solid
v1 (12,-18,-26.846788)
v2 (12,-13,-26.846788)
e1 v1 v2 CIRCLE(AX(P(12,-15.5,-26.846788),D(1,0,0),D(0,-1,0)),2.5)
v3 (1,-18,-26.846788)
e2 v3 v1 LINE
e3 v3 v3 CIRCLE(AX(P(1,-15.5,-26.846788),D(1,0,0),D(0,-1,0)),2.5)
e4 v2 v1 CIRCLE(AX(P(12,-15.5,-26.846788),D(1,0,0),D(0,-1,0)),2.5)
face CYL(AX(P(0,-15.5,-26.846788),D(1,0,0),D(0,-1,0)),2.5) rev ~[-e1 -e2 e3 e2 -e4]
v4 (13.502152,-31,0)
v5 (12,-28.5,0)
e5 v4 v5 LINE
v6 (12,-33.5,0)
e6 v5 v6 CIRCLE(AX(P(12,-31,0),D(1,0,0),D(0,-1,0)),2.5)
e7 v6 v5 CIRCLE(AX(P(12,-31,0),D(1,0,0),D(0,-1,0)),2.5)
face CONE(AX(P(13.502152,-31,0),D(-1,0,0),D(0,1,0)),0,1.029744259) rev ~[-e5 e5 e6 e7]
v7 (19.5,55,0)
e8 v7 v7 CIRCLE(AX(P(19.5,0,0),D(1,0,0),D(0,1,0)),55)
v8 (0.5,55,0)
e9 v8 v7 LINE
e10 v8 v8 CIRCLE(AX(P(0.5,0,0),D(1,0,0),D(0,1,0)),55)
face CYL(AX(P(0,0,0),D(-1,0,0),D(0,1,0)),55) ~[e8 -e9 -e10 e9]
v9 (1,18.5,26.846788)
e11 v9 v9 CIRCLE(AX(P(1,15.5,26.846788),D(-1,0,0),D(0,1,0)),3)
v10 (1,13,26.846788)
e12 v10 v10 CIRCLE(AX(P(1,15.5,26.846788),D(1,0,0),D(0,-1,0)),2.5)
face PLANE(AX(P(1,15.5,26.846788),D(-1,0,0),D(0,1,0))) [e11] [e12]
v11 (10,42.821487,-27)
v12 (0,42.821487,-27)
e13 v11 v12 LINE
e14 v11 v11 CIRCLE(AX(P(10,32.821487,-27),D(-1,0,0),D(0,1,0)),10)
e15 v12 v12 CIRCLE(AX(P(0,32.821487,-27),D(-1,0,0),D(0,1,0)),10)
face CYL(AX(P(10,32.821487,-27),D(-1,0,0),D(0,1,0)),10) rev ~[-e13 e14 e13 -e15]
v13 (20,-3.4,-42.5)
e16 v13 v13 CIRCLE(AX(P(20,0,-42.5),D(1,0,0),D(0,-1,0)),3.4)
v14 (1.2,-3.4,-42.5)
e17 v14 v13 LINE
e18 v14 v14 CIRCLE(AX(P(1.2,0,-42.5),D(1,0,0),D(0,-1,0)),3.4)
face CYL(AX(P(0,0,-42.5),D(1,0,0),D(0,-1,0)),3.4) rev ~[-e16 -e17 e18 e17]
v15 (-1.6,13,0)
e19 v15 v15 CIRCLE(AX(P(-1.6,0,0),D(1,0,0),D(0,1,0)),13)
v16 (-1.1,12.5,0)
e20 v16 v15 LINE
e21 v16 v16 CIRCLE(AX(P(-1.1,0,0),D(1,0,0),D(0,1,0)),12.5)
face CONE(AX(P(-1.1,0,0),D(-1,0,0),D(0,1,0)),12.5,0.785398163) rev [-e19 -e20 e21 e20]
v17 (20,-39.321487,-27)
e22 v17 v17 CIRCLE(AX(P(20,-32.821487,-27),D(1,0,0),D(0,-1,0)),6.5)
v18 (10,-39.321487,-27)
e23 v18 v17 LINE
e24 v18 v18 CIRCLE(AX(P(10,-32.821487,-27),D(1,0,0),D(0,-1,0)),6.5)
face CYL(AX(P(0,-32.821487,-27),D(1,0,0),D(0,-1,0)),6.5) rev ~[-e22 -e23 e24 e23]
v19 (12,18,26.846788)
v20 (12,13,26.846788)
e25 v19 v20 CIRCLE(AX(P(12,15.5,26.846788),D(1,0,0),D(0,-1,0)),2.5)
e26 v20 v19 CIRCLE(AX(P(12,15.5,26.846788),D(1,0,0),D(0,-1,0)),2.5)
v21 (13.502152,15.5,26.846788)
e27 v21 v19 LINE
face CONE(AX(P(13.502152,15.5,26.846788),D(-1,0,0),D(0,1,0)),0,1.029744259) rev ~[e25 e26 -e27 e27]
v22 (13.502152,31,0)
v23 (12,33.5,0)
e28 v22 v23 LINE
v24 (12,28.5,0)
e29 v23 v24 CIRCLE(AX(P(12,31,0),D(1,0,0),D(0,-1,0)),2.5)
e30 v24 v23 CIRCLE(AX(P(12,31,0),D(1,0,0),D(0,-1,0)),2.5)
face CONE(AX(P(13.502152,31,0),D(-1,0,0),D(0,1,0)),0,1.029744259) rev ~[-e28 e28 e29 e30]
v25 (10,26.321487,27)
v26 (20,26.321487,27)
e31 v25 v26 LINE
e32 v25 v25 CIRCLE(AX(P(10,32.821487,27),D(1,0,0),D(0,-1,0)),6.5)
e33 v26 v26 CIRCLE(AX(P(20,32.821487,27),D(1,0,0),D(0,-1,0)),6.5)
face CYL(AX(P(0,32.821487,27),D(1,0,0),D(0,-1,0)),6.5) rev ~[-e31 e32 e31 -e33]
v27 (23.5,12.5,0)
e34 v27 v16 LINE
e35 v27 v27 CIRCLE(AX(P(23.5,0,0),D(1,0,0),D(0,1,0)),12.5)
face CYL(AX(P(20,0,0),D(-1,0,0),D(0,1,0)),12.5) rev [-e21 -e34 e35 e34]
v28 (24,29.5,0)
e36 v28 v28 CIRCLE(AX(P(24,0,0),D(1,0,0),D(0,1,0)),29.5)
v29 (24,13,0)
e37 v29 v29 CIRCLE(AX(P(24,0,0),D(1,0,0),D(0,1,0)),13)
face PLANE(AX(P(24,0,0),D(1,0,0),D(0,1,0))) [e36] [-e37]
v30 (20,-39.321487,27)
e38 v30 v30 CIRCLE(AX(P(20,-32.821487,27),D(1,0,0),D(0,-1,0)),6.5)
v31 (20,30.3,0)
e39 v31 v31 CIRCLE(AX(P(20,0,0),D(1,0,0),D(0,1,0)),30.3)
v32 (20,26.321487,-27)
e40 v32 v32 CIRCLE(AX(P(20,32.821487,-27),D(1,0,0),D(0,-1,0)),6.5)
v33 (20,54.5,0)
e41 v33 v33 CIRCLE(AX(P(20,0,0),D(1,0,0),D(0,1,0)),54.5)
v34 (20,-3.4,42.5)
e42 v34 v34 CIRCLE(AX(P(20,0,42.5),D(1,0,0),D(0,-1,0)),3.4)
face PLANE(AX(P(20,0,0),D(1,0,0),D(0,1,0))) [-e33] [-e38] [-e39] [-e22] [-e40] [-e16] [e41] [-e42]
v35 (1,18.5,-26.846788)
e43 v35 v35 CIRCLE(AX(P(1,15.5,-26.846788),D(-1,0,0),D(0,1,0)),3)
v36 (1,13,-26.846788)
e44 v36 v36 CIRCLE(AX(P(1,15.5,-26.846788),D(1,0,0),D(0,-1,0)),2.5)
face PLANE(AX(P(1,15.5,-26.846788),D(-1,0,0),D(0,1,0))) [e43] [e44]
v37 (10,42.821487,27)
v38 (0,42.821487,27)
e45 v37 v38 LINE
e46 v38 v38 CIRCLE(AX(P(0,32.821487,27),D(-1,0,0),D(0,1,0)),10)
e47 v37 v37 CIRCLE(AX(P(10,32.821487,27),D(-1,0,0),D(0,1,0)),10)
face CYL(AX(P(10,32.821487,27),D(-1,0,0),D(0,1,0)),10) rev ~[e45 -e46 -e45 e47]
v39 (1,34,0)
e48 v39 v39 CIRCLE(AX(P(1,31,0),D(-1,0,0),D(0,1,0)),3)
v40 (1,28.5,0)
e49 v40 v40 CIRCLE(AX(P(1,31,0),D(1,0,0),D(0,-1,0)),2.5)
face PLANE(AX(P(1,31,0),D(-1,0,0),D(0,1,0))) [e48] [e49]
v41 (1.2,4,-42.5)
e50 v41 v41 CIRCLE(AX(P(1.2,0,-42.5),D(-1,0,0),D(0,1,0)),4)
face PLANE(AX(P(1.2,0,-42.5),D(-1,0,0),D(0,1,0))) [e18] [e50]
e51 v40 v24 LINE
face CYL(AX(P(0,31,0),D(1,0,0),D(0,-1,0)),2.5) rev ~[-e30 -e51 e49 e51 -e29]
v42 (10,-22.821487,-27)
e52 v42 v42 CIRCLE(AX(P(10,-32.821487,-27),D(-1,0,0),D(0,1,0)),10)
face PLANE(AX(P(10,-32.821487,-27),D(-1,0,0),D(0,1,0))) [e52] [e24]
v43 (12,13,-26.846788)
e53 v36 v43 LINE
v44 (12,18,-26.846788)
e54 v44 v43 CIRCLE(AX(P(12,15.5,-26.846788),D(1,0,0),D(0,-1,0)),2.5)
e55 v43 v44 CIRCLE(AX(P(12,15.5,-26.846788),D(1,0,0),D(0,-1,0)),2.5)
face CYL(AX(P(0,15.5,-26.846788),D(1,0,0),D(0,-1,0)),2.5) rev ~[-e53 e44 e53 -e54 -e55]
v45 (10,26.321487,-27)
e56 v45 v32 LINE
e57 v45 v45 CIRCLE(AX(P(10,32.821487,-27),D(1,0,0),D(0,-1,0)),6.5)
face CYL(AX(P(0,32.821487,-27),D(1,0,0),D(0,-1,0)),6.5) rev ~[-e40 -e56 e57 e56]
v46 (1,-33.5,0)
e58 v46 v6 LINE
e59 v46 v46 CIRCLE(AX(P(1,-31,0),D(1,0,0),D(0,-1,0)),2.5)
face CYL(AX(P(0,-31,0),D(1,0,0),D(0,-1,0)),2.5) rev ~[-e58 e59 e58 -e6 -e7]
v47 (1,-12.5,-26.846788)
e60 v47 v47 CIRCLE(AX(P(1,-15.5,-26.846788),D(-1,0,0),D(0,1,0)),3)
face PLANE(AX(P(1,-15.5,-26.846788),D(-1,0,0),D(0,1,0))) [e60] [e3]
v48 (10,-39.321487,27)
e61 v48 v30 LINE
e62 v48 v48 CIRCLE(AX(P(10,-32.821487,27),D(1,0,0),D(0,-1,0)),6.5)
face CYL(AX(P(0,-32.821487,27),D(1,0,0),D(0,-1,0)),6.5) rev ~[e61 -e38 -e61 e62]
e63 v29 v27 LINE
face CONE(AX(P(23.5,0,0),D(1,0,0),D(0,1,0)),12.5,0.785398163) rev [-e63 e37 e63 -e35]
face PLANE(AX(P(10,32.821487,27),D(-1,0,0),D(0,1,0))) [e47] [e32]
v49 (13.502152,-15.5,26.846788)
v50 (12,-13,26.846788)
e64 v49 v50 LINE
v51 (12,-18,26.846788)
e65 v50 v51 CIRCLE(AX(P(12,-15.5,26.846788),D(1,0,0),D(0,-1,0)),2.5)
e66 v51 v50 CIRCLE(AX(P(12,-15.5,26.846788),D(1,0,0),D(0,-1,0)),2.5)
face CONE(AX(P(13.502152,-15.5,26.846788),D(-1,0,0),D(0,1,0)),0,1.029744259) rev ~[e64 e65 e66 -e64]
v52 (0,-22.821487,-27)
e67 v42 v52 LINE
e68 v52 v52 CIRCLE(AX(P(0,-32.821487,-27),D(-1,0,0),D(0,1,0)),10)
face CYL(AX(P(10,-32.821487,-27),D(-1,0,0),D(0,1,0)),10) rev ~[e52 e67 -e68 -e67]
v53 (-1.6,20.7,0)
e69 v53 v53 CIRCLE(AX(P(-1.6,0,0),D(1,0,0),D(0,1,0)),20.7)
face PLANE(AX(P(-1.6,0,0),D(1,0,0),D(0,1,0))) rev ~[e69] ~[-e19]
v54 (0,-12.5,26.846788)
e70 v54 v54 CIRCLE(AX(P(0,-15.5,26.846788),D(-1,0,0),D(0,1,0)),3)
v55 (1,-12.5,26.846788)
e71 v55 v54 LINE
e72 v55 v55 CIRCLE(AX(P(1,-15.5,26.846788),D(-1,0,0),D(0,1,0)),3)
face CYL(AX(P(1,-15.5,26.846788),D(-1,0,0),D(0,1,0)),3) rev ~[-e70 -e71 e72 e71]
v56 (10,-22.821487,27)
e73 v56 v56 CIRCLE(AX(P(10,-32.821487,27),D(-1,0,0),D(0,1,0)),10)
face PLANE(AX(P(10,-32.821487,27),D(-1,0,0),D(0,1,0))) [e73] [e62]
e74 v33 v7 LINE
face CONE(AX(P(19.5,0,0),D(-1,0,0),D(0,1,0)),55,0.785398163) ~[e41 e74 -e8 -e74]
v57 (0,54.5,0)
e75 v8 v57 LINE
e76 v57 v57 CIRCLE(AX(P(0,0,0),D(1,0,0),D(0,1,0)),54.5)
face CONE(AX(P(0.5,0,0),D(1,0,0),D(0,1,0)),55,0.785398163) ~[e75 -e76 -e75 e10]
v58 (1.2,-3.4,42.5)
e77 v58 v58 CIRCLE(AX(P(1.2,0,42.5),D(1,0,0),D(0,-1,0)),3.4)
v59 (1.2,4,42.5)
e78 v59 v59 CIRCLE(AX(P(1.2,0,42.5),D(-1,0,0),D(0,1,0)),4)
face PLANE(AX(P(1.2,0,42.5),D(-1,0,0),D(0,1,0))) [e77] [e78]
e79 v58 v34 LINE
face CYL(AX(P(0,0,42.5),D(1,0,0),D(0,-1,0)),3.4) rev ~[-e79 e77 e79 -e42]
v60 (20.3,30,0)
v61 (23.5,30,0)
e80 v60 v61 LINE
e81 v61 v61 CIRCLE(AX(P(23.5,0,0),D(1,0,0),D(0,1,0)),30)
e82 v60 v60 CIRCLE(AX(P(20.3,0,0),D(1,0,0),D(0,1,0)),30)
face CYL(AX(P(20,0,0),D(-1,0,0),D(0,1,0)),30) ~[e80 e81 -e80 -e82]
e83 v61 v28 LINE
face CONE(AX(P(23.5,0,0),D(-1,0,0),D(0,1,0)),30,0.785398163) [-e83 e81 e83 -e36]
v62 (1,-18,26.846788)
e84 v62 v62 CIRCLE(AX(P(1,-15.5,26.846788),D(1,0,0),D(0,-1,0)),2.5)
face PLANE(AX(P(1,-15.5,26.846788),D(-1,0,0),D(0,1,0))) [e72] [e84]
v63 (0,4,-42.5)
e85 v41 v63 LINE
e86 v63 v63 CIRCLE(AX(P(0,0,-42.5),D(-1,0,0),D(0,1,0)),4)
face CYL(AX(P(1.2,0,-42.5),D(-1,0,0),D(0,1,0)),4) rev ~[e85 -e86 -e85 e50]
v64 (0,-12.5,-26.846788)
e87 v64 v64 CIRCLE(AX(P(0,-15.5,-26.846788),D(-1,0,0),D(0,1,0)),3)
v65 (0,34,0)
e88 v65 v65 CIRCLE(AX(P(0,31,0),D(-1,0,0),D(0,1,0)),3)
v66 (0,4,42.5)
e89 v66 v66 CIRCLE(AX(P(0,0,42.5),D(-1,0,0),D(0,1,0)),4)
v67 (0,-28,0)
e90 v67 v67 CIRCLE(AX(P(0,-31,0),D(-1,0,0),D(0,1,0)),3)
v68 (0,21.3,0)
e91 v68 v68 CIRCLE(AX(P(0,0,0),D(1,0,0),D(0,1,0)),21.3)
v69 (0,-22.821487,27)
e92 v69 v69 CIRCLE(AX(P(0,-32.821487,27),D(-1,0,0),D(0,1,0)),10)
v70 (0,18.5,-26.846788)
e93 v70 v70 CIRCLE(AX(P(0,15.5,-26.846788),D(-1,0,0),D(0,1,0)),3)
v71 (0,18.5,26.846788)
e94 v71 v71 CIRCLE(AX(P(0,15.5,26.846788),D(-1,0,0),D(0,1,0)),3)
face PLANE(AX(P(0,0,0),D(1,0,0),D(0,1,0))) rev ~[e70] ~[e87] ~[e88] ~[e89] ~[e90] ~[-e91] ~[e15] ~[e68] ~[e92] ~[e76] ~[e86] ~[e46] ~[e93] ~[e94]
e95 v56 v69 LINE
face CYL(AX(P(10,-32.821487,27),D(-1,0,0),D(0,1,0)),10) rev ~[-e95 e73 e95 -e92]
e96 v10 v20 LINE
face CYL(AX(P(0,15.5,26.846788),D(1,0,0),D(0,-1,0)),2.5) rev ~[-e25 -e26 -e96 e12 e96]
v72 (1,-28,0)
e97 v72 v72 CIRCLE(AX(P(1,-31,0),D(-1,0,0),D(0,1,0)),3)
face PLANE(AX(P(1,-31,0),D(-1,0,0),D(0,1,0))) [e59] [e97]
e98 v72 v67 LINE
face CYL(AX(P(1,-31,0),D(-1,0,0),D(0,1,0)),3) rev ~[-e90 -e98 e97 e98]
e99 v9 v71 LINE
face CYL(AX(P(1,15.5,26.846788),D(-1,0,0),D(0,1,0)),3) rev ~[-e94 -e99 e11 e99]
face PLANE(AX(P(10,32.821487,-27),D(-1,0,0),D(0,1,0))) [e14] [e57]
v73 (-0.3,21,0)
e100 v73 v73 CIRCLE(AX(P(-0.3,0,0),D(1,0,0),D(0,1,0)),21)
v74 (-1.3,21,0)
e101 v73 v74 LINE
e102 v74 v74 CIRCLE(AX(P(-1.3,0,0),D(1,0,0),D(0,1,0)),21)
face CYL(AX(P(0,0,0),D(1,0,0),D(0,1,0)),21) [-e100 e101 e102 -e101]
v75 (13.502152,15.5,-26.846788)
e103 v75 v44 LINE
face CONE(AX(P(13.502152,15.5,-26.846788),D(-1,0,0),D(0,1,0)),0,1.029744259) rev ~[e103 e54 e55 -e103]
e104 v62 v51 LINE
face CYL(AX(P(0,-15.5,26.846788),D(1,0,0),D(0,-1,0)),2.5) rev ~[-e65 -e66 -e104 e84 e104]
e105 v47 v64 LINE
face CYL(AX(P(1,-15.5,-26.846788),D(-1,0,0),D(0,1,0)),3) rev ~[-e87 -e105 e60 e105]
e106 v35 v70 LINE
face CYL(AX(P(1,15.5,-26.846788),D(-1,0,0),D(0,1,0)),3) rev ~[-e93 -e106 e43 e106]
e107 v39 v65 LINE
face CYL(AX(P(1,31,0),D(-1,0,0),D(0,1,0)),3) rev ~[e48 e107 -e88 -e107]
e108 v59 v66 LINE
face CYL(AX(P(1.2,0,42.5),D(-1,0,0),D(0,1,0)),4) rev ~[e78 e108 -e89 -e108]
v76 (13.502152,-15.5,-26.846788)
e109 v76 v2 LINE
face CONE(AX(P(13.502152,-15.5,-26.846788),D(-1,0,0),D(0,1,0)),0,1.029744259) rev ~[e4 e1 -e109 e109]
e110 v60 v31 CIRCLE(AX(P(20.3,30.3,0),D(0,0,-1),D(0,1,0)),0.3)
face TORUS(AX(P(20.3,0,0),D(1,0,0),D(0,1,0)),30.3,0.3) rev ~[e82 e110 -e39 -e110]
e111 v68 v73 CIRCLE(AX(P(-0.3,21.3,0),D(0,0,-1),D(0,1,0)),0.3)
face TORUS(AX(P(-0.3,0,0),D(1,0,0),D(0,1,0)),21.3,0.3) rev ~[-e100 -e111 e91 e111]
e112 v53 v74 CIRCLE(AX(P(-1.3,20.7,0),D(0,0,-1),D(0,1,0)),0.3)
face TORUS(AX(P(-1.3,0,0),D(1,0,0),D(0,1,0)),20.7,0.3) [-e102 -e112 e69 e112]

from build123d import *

# Parameters (mm, degrees)
F0_R           = 55
F0_R_2         = 30
F0_R_3         = 21
F0_R_4         = 12.5
F1_DEPTH       = 20
F2_DEPTH       = 1.6
F3_R           = 30
F3_R_2         = 12.5
F4_DEPTH       = 4
F5_D           = 5
F5_DEPTH       = 12
F5_CBORE_D     = 6
F5_CBORE_DEPTH = 1
F5_TIP         = 1.5021515476
F6_D           = 13
F6_CBORE_D     = 20
F6_CBORE_DEPTH = 10
F7_D           = 6.8
F7_CBORE_D     = 8
F7_CBORE_DEPTH = 1.2
F8_SIZE2       = 0.5
F8_SIZE        = 0.5
F9_R           = 0.3


with BuildPart() as f1:
    # F0 (on Right) → F1 (new body)
    with BuildSketch(Plane.YZ):
        Circle(F0_R)
        Circle(F0_R_2, mode=Mode.SUBTRACT)
        Circle(F0_R_2)
        Circle(F0_R_3, mode=Mode.SUBTRACT)
        Circle(F0_R_3)
        Circle(F0_R_4, mode=Mode.SUBTRACT)
    extrude(amount=F1_DEPTH)

    # F0 (on Right) → F2 (join)
    with BuildSketch(Plane.YZ):
        Circle(F0_R_3)
        Circle(F0_R_4, mode=Mode.SUBTRACT)
    extrude(amount=-F2_DEPTH)

    # F3 (on face) → F4 (join)
    with BuildSketch(Plane.YZ.offset(20)):
        Circle(F3_R)
        Circle(F3_R_2, mode=Mode.SUBTRACT)
    extrude(amount=F4_DEPTH)

    # F5
    with Locations(Plane(origin=(0, 0, 0), x_dir=(0, 1, 0), z_dir=(-1, 0, 0))):
        with Locations((-15.5, -26.8467875173), (-31, 0), (-15.5, 26.8467875173), (15.5, -26.8467875173), (31, 0), (15.5, 26.8467875173)):
            CounterBoreHole(F5_D / 2, F5_CBORE_D / 2, F5_CBORE_DEPTH, depth=F5_DEPTH)
            with Locations((0, 0, -(F5_DEPTH + F5_TIP / 2))):  # 118° drill point
                Cone(0, F5_D / 2, F5_TIP, mode=Mode.SUBTRACT)

    # F6 (through all)
    with Locations(Plane(origin=(0, 0, 0), x_dir=(0, 1, 0), z_dir=(-1, 0, 0))):
        with Locations((-32.8214868646, 27), (-32.8214868646, -27), (32.8214868646, -27), (32.8214868646, 27)):
            CounterBoreHole(F6_D / 2, F6_CBORE_D / 2, F6_CBORE_DEPTH)

    # F7 (through all)
    with Locations(Plane(origin=(0, 0, 0), x_dir=(0, 1, 0), z_dir=(-1, 0, 0))):
        with Locations((0, -42.5), (0, 42.5)):
            CounterBoreHole(F7_D / 2, F7_CBORE_D / 2, F7_CBORE_DEPTH)

    # F8
    f8_edges = [f1.edges().sort_by_distance(p)[0] for p in [
        (20, -55, 0),
        (0, -55, 0),
        (24, -30, 0),
        (24, -12.5, 0),
        (-1.6, -12.5, 0),
    ]]
    chamfer(f8_edges, length=F8_SIZE, length2=F8_SIZE2)

    # F9
    f9_edges = [f1.edges().sort_by_distance(p)[0] for p in [
        (20, -30, 0),
        (0, -21, 0),
        (-1.6, -21, 0),
    ]]
    fillet(f9_edges, radius=F9_R)


solid = f1.part
